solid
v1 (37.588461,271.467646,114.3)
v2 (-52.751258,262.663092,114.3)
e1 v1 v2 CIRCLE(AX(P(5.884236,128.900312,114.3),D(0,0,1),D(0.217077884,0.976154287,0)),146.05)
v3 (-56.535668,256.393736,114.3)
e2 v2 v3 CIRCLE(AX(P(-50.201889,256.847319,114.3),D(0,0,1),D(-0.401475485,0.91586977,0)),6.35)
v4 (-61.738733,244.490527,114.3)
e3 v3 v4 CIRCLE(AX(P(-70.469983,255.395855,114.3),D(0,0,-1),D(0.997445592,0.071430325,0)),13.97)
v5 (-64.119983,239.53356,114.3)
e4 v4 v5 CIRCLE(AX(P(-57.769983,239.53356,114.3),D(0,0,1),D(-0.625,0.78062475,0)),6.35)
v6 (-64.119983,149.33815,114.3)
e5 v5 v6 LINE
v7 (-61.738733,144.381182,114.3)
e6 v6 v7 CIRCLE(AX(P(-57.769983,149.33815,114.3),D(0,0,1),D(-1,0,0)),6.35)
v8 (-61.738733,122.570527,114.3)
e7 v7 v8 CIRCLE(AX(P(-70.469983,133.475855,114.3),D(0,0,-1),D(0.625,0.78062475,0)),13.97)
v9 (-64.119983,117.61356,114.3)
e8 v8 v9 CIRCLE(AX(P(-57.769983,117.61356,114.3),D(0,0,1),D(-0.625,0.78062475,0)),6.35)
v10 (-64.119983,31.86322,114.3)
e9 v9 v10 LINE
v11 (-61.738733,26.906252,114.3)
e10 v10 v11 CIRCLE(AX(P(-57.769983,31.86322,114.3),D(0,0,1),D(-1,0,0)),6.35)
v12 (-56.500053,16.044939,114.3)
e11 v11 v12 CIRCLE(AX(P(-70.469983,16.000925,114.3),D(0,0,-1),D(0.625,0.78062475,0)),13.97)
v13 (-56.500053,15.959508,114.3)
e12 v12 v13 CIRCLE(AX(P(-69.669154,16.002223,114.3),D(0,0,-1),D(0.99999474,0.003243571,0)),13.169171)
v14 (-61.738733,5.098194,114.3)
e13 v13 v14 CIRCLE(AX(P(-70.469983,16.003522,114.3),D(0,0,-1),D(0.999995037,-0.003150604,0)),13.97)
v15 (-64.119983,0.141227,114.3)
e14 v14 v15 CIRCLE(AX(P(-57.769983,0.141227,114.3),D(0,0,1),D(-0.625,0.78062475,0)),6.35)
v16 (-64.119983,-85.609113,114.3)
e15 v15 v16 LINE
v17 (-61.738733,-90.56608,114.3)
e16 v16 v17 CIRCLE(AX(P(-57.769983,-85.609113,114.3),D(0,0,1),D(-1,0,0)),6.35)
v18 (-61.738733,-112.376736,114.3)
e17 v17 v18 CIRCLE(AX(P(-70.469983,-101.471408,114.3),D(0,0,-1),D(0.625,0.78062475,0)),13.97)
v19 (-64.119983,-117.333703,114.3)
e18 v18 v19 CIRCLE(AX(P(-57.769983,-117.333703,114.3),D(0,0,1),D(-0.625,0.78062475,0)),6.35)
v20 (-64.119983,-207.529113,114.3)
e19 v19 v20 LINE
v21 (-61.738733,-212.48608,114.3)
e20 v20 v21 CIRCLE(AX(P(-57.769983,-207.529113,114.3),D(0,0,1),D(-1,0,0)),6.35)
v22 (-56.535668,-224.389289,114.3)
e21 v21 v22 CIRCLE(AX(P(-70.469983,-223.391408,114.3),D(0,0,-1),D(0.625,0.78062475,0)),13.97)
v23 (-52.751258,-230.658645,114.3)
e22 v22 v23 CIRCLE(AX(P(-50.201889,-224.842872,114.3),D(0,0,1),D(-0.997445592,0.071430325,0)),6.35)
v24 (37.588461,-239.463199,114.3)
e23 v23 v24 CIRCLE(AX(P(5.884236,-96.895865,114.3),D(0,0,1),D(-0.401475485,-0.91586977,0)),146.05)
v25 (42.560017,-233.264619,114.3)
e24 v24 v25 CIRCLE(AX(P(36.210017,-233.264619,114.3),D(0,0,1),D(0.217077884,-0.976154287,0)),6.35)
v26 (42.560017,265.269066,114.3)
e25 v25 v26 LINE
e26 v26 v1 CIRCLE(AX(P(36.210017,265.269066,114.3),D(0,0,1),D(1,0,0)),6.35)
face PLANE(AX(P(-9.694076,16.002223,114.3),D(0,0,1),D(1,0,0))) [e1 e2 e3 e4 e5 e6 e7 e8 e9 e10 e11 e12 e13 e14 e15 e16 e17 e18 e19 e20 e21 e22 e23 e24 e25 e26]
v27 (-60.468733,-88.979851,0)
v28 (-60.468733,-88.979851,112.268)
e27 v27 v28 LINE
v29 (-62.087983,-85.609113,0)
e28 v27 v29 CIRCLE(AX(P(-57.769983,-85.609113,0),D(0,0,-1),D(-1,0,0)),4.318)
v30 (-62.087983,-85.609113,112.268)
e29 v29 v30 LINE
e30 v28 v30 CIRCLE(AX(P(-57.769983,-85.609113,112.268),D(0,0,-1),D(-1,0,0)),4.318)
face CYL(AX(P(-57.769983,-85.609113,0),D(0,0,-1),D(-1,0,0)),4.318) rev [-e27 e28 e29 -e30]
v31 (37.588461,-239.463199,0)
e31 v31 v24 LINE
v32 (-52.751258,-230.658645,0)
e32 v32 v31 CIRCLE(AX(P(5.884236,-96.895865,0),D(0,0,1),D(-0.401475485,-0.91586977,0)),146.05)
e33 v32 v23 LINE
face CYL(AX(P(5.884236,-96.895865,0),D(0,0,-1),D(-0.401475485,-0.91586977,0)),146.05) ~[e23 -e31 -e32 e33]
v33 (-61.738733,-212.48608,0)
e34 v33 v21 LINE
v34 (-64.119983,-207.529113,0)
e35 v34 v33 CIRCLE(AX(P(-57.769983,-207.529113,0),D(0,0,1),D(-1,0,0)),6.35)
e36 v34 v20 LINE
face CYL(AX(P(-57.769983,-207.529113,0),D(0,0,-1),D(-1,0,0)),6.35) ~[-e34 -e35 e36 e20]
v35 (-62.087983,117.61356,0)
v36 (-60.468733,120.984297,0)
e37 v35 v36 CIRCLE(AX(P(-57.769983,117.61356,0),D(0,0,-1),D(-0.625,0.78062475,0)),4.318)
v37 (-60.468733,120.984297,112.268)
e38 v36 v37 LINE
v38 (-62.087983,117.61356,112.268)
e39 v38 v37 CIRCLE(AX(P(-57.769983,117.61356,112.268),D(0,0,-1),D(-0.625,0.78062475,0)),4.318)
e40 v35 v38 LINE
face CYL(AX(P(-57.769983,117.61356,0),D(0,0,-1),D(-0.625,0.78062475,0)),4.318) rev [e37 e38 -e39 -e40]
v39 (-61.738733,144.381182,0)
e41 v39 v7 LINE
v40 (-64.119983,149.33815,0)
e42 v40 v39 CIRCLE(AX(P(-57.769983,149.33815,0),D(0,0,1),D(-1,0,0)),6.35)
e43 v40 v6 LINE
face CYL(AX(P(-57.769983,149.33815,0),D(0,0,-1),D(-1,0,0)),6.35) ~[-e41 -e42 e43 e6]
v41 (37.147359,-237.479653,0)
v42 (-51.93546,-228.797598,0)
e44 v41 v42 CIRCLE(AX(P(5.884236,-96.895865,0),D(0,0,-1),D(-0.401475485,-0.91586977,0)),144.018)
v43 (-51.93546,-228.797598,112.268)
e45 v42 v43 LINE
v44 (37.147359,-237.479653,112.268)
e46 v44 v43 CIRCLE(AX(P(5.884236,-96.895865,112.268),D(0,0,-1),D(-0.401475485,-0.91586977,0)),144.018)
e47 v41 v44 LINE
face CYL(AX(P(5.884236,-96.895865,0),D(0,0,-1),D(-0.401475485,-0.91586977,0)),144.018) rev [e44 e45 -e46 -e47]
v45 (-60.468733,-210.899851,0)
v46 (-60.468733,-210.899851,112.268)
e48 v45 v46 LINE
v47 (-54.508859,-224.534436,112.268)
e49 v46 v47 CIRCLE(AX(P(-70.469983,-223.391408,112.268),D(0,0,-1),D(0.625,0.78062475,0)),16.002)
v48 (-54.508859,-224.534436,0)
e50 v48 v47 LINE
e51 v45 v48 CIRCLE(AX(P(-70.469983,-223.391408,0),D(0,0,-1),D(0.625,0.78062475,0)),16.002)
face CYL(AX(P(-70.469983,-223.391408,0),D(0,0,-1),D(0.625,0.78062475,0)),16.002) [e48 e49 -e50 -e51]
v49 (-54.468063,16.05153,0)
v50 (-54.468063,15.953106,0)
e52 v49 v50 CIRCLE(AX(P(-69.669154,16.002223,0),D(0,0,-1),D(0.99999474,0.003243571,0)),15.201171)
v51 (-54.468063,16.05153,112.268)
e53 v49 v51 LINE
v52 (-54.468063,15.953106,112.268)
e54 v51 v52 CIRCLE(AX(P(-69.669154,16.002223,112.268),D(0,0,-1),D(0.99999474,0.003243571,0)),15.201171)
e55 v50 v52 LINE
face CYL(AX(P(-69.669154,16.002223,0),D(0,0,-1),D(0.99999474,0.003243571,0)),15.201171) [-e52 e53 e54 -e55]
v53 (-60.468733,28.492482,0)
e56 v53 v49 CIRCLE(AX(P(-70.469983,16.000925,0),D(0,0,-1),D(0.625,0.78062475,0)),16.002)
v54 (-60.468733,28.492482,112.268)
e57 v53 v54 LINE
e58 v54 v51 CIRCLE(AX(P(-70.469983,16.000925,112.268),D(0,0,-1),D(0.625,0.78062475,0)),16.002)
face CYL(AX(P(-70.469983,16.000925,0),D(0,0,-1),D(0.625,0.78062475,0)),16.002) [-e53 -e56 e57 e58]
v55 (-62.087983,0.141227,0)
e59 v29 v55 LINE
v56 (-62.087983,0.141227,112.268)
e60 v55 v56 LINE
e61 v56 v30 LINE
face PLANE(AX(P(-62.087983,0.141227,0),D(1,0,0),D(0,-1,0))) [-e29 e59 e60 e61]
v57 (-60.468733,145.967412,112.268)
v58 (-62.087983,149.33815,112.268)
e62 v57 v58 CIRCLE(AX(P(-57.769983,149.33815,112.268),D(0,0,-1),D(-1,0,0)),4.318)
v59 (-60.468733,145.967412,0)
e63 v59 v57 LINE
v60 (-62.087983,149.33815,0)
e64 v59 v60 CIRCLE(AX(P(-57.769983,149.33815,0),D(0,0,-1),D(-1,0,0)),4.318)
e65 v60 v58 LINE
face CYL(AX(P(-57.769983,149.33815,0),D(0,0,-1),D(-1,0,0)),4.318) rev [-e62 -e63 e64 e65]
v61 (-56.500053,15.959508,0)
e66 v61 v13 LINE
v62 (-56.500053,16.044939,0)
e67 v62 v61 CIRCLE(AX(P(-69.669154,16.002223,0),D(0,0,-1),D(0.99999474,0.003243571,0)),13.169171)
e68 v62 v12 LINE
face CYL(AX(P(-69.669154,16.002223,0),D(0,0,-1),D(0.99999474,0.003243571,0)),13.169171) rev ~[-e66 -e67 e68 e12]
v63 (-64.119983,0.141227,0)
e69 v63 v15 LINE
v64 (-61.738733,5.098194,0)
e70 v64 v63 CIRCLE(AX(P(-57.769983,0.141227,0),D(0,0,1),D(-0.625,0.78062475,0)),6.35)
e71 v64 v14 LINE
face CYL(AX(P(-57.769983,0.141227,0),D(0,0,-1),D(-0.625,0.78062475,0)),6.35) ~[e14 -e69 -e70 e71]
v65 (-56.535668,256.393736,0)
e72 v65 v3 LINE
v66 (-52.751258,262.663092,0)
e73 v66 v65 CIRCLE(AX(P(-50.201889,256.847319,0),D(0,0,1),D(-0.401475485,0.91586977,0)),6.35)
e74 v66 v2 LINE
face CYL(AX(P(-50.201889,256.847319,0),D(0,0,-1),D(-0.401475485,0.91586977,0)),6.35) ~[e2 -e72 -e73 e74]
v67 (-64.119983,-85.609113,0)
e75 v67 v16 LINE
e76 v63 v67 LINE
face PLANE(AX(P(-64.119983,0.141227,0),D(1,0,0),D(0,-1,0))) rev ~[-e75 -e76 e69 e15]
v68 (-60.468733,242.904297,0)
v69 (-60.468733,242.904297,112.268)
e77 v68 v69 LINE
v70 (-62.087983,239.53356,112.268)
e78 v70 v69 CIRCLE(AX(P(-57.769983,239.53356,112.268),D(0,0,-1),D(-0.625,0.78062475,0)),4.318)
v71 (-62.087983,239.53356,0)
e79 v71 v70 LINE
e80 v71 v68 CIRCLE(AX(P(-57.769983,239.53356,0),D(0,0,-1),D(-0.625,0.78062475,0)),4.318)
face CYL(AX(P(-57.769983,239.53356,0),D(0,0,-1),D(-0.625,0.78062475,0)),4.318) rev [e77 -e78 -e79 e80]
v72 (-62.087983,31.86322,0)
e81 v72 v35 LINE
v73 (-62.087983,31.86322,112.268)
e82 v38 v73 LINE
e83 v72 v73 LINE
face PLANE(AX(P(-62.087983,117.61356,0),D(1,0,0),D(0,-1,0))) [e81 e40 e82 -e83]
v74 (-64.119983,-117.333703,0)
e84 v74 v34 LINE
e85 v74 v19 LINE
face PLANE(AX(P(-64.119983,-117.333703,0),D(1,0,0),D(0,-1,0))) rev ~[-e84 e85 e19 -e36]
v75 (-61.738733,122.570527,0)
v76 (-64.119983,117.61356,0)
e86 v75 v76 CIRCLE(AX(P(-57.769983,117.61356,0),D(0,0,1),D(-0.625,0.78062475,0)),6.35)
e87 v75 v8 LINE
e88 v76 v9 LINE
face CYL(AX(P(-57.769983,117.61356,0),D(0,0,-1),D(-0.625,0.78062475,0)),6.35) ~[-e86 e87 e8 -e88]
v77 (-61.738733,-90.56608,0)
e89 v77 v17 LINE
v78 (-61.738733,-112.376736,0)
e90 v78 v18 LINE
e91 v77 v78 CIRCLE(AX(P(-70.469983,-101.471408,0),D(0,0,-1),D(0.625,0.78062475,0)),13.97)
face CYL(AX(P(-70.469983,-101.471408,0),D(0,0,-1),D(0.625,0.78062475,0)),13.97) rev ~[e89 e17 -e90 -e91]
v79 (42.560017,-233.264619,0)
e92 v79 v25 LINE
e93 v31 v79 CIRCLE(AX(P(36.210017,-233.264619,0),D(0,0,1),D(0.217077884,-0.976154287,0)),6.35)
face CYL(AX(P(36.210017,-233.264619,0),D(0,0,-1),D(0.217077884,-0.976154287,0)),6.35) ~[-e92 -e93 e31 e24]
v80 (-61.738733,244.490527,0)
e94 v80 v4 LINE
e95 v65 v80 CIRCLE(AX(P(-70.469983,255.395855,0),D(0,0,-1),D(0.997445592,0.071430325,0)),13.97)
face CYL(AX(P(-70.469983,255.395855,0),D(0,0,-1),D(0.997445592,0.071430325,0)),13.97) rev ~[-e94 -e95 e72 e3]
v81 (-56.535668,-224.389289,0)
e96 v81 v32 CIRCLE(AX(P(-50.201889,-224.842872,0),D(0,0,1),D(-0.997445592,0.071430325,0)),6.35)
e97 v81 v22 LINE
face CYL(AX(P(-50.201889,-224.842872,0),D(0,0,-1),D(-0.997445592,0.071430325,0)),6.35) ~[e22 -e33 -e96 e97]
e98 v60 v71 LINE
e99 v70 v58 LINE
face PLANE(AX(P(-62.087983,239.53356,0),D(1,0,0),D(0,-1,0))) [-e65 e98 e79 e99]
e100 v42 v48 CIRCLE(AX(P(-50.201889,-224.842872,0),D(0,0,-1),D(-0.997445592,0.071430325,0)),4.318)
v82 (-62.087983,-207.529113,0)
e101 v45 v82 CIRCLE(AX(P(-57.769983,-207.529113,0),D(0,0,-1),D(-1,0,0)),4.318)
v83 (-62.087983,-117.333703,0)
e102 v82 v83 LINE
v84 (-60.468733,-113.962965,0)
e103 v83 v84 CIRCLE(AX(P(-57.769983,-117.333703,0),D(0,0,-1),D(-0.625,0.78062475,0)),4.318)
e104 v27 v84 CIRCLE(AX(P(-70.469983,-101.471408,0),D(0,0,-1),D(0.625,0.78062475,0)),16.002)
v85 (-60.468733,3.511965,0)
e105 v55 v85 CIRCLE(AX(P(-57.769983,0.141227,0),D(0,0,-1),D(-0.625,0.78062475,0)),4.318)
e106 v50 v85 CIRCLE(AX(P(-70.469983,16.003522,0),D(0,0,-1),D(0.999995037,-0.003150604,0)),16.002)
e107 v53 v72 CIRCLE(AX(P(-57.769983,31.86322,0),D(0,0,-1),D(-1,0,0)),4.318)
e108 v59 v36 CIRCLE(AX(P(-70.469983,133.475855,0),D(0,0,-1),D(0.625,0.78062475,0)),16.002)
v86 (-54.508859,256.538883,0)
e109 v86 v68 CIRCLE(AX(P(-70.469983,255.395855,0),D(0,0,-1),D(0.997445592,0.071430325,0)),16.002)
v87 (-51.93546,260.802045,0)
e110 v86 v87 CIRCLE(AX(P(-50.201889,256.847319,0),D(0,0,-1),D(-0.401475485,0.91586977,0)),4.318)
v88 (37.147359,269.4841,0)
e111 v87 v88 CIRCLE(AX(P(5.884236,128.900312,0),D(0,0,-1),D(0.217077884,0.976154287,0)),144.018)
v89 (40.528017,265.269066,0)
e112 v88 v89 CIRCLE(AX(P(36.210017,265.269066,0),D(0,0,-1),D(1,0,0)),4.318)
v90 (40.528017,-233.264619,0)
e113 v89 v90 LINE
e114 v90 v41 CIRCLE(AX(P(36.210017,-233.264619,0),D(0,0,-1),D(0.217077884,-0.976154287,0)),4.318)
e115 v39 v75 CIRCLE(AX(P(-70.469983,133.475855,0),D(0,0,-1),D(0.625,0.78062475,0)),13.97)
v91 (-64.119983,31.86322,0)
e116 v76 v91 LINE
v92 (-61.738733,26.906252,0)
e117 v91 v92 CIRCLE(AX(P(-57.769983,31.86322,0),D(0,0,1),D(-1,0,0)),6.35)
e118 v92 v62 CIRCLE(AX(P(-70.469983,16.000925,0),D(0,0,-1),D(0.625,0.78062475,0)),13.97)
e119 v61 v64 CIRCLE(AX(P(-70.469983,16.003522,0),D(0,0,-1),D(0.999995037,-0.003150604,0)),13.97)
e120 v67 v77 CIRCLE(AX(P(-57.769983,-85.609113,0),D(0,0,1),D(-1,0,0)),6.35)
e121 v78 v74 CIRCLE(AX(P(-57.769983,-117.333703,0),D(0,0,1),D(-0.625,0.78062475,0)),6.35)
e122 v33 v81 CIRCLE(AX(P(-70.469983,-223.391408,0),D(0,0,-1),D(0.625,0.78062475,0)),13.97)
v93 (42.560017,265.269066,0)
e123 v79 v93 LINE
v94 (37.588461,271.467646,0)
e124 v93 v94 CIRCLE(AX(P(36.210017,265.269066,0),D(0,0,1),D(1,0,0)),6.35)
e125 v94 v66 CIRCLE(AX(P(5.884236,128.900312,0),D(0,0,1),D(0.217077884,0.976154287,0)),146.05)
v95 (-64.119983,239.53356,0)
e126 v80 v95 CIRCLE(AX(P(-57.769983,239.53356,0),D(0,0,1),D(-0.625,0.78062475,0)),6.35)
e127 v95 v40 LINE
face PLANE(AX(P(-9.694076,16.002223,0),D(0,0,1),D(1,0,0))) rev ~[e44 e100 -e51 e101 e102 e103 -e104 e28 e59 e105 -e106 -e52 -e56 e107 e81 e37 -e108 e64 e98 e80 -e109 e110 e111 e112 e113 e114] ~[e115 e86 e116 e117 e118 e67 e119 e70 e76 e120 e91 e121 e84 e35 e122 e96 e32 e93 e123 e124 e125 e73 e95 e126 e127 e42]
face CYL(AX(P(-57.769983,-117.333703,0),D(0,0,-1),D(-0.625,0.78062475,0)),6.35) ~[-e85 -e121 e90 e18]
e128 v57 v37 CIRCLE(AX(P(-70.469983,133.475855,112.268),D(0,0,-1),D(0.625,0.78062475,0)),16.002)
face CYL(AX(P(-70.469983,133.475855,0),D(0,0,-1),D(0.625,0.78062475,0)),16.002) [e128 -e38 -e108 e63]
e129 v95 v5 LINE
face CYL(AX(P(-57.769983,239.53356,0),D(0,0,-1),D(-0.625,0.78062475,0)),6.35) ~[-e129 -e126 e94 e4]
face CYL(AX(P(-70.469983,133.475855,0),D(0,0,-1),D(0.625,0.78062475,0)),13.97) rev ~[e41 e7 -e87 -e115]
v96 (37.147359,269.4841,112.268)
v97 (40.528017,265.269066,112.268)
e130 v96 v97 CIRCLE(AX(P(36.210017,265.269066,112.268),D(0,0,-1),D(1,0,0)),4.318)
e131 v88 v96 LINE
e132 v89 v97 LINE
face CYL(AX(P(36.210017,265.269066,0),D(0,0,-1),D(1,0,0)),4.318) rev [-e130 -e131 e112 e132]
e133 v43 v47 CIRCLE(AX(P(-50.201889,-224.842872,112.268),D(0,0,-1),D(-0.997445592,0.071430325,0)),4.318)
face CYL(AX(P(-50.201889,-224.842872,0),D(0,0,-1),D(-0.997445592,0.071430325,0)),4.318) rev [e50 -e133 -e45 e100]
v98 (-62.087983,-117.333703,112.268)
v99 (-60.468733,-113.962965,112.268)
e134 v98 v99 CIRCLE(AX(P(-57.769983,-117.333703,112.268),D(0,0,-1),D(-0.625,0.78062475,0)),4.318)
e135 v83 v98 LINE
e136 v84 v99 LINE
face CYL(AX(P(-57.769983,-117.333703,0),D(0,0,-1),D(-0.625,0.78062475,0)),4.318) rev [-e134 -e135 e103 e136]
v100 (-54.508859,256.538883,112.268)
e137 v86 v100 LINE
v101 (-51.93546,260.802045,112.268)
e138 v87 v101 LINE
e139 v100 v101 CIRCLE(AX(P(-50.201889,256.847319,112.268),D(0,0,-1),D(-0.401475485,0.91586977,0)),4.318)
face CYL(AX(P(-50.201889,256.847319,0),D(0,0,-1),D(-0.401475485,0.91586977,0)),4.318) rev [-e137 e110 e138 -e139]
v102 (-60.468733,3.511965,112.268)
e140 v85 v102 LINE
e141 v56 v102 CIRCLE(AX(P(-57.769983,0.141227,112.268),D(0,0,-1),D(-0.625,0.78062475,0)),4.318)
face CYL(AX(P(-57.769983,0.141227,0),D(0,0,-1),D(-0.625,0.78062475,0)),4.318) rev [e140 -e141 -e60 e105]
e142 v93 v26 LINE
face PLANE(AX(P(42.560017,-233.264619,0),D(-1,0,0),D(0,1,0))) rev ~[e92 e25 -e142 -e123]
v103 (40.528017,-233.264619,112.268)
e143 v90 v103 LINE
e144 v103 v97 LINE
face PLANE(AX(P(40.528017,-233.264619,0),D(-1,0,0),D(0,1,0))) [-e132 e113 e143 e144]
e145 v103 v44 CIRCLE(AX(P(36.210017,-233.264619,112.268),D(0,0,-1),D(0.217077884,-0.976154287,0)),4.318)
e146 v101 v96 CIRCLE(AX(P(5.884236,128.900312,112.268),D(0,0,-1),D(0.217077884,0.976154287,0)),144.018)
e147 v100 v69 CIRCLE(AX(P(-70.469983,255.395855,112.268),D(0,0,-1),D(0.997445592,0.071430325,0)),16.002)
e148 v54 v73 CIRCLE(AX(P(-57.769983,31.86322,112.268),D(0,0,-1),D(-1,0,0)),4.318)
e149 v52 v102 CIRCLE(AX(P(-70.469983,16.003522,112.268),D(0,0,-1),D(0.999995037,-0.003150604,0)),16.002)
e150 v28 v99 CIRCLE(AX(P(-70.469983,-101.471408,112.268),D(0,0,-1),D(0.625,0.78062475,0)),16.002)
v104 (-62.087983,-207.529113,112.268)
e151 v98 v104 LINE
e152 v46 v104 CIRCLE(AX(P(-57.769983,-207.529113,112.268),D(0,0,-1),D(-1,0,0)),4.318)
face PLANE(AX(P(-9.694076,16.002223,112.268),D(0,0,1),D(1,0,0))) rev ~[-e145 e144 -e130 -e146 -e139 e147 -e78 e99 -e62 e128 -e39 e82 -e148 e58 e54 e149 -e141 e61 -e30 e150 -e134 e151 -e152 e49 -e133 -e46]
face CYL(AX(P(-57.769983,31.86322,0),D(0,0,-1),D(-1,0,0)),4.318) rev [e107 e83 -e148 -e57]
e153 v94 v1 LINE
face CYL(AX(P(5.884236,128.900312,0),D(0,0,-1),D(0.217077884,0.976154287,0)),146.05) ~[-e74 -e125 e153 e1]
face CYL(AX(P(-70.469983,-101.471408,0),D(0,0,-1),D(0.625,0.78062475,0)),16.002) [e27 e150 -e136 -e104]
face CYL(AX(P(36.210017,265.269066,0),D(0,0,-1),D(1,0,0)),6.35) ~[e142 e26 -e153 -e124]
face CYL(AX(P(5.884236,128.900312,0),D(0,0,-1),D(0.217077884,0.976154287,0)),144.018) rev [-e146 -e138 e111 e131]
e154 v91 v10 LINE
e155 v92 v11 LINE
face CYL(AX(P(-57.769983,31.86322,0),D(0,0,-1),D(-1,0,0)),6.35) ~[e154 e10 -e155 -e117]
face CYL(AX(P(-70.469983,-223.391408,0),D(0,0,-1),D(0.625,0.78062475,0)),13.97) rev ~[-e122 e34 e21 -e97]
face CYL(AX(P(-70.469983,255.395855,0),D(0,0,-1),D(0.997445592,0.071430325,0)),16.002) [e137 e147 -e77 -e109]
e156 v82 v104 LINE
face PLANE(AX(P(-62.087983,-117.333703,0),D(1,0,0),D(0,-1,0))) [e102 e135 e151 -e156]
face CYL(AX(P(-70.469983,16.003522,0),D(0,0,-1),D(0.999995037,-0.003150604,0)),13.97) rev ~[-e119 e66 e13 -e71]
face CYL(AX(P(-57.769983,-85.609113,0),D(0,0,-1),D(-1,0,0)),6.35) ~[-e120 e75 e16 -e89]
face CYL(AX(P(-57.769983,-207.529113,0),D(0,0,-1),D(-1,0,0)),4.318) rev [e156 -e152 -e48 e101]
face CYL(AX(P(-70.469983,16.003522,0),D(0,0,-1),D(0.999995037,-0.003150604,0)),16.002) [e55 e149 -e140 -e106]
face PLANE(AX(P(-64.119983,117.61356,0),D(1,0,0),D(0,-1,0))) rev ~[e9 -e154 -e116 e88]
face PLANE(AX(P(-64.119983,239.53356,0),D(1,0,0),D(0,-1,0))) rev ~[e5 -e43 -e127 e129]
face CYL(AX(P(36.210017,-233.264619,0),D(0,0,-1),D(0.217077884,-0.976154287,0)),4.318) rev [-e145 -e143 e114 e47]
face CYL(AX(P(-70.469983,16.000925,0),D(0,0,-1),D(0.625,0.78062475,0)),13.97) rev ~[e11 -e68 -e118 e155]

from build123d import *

# Parameters (mm, degrees)
F1_DEPTH = 114.3
F2_T     = -2.032


# Not quite as in the source:
# - ends of sketch curves that miss each other by under 0.0002 mm in the source are joined


with BuildPart() as f1:
    # F0 (on Top) → F1 (new body)
    with BuildSketch(Plane.XY):
        with BuildLine():
            ThreePointArc((-56.5356683944, -224.3892894538), (-55.638228484, -228.1244435583), (-52.7512582129, -230.658645056))
            ThreePointArc((-52.7512582129, -230.658645056), (-8.2827450913, -242.2571362771), (37.5884612507, -239.4631988056))
            ThreePointArc((37.5884612507, -239.4631988056), (41.1635822204, -237.2376139869), (42.5600166876, -233.2646190823))
            Line((42.5600166876, -233.2646190823), (42.5600166876, 15.9969440547))
            Line((42.5600166876, 15.9969440547), (42.5600166876, 16.0075028557))
            Line((42.5600166876, 16.0075028557), (42.5600166876, 265.2690659926))
            ThreePointArc((42.5600166876, 265.2690659926), (41.1635822204, 269.2420608973), (37.5884612507, 271.467645716))
            ThreePointArc((37.5884612507, 271.467645716), (-8.2827450913, 274.2615831875), (-52.7512582129, 262.6630919663))
            ThreePointArc((-52.7512582129, 262.6630919663), (-55.638228484, 260.1288904686), (-56.5356683944, 256.3937363641))
            ThreePointArc((-56.5356683944, 256.3937363641), (-57.6694537634, 249.8005581937), (-61.7387333124, 244.4905269695))
            ThreePointArc((-61.7387333124, 244.4905269695), (-63.4937959622, 242.2831904653), (-64.1199833124, 239.5335598083))
            Line((-64.1199833124, 239.5335598083), (-64.1199833124, 149.3381496402))
            ThreePointArc((-64.1199833124, 149.3381496402), (-63.4937959622, 146.5885189832), (-61.7387333124, 144.3811824789))
            ThreePointArc((-61.7387333124, 144.3811824789), (-56.4999833124, 133.4758547242), (-61.7387333124, 122.5705269695))
            ThreePointArc((-61.7387333124, 122.5705269695), (-63.4937959622, 120.3631904653), (-64.1199833124, 117.6135598083))
            Line((-64.1199833124, 117.6135598083), (-64.1199833124, 31.8632195798))
            ThreePointArc((-64.1199833124, 31.8632195798), (-63.4937959622, 29.1135889227), (-61.7387333124, 26.9062524185))
            ThreePointArc((-61.7387333124, 26.9062524185), (-57.8871404165, 22.0699414424), (-56.5000526478, 16.044938603))
            ThreePointArc((-56.5000526478, 16.044938603), (-56.4999833728, 16.0022234616), (-56.5000526478, 15.9595083074))
            ThreePointArc((-56.5000526478, 15.9595083074), (-57.8871404165, 9.9345054679), (-61.7387333124, 5.0981944918))
            ThreePointArc((-61.7387333124, 5.0981944918), (-63.4937959622, 2.8908579876), (-64.1199833124, 0.1412273306))
            Line((-64.1199833124, 0.1412273306), (-64.1199833124, -85.609112898))
            ThreePointArc((-64.1199833124, -85.609112898), (-63.4937959622, -88.358743555), (-61.7387333124, -90.5660800592))
            ThreePointArc((-61.7387333124, -90.5660800592), (-56.4999833124, -101.4714078139), (-61.7387333124, -112.3767355686))
            ThreePointArc((-61.7387333124, -112.3767355686), (-63.4937959622, -114.5840720728), (-64.1199833124, -117.3337027298))
            Line((-64.1199833124, -117.3337027298), (-64.1199833124, -207.529112898))
            ThreePointArc((-64.1199833124, -207.529112898), (-63.4937959622, -210.278743555), (-61.7387333124, -212.4860800592))
            ThreePointArc((-61.7387333124, -212.4860800592), (-57.6694537634, -217.7961112834), (-56.5356683944, -224.3892894538))
        make_face()
    extrude(amount=F1_DEPTH)

    # F2
    f2_openings = [f1.faces().sort_by_distance(p)[0] for p in [
        (-9.762898, 16.002223, 0),
    ]]
    offset(amount=F2_T, openings=f2_openings, kind=Kind.INTERSECTION)


solid = f1.part
